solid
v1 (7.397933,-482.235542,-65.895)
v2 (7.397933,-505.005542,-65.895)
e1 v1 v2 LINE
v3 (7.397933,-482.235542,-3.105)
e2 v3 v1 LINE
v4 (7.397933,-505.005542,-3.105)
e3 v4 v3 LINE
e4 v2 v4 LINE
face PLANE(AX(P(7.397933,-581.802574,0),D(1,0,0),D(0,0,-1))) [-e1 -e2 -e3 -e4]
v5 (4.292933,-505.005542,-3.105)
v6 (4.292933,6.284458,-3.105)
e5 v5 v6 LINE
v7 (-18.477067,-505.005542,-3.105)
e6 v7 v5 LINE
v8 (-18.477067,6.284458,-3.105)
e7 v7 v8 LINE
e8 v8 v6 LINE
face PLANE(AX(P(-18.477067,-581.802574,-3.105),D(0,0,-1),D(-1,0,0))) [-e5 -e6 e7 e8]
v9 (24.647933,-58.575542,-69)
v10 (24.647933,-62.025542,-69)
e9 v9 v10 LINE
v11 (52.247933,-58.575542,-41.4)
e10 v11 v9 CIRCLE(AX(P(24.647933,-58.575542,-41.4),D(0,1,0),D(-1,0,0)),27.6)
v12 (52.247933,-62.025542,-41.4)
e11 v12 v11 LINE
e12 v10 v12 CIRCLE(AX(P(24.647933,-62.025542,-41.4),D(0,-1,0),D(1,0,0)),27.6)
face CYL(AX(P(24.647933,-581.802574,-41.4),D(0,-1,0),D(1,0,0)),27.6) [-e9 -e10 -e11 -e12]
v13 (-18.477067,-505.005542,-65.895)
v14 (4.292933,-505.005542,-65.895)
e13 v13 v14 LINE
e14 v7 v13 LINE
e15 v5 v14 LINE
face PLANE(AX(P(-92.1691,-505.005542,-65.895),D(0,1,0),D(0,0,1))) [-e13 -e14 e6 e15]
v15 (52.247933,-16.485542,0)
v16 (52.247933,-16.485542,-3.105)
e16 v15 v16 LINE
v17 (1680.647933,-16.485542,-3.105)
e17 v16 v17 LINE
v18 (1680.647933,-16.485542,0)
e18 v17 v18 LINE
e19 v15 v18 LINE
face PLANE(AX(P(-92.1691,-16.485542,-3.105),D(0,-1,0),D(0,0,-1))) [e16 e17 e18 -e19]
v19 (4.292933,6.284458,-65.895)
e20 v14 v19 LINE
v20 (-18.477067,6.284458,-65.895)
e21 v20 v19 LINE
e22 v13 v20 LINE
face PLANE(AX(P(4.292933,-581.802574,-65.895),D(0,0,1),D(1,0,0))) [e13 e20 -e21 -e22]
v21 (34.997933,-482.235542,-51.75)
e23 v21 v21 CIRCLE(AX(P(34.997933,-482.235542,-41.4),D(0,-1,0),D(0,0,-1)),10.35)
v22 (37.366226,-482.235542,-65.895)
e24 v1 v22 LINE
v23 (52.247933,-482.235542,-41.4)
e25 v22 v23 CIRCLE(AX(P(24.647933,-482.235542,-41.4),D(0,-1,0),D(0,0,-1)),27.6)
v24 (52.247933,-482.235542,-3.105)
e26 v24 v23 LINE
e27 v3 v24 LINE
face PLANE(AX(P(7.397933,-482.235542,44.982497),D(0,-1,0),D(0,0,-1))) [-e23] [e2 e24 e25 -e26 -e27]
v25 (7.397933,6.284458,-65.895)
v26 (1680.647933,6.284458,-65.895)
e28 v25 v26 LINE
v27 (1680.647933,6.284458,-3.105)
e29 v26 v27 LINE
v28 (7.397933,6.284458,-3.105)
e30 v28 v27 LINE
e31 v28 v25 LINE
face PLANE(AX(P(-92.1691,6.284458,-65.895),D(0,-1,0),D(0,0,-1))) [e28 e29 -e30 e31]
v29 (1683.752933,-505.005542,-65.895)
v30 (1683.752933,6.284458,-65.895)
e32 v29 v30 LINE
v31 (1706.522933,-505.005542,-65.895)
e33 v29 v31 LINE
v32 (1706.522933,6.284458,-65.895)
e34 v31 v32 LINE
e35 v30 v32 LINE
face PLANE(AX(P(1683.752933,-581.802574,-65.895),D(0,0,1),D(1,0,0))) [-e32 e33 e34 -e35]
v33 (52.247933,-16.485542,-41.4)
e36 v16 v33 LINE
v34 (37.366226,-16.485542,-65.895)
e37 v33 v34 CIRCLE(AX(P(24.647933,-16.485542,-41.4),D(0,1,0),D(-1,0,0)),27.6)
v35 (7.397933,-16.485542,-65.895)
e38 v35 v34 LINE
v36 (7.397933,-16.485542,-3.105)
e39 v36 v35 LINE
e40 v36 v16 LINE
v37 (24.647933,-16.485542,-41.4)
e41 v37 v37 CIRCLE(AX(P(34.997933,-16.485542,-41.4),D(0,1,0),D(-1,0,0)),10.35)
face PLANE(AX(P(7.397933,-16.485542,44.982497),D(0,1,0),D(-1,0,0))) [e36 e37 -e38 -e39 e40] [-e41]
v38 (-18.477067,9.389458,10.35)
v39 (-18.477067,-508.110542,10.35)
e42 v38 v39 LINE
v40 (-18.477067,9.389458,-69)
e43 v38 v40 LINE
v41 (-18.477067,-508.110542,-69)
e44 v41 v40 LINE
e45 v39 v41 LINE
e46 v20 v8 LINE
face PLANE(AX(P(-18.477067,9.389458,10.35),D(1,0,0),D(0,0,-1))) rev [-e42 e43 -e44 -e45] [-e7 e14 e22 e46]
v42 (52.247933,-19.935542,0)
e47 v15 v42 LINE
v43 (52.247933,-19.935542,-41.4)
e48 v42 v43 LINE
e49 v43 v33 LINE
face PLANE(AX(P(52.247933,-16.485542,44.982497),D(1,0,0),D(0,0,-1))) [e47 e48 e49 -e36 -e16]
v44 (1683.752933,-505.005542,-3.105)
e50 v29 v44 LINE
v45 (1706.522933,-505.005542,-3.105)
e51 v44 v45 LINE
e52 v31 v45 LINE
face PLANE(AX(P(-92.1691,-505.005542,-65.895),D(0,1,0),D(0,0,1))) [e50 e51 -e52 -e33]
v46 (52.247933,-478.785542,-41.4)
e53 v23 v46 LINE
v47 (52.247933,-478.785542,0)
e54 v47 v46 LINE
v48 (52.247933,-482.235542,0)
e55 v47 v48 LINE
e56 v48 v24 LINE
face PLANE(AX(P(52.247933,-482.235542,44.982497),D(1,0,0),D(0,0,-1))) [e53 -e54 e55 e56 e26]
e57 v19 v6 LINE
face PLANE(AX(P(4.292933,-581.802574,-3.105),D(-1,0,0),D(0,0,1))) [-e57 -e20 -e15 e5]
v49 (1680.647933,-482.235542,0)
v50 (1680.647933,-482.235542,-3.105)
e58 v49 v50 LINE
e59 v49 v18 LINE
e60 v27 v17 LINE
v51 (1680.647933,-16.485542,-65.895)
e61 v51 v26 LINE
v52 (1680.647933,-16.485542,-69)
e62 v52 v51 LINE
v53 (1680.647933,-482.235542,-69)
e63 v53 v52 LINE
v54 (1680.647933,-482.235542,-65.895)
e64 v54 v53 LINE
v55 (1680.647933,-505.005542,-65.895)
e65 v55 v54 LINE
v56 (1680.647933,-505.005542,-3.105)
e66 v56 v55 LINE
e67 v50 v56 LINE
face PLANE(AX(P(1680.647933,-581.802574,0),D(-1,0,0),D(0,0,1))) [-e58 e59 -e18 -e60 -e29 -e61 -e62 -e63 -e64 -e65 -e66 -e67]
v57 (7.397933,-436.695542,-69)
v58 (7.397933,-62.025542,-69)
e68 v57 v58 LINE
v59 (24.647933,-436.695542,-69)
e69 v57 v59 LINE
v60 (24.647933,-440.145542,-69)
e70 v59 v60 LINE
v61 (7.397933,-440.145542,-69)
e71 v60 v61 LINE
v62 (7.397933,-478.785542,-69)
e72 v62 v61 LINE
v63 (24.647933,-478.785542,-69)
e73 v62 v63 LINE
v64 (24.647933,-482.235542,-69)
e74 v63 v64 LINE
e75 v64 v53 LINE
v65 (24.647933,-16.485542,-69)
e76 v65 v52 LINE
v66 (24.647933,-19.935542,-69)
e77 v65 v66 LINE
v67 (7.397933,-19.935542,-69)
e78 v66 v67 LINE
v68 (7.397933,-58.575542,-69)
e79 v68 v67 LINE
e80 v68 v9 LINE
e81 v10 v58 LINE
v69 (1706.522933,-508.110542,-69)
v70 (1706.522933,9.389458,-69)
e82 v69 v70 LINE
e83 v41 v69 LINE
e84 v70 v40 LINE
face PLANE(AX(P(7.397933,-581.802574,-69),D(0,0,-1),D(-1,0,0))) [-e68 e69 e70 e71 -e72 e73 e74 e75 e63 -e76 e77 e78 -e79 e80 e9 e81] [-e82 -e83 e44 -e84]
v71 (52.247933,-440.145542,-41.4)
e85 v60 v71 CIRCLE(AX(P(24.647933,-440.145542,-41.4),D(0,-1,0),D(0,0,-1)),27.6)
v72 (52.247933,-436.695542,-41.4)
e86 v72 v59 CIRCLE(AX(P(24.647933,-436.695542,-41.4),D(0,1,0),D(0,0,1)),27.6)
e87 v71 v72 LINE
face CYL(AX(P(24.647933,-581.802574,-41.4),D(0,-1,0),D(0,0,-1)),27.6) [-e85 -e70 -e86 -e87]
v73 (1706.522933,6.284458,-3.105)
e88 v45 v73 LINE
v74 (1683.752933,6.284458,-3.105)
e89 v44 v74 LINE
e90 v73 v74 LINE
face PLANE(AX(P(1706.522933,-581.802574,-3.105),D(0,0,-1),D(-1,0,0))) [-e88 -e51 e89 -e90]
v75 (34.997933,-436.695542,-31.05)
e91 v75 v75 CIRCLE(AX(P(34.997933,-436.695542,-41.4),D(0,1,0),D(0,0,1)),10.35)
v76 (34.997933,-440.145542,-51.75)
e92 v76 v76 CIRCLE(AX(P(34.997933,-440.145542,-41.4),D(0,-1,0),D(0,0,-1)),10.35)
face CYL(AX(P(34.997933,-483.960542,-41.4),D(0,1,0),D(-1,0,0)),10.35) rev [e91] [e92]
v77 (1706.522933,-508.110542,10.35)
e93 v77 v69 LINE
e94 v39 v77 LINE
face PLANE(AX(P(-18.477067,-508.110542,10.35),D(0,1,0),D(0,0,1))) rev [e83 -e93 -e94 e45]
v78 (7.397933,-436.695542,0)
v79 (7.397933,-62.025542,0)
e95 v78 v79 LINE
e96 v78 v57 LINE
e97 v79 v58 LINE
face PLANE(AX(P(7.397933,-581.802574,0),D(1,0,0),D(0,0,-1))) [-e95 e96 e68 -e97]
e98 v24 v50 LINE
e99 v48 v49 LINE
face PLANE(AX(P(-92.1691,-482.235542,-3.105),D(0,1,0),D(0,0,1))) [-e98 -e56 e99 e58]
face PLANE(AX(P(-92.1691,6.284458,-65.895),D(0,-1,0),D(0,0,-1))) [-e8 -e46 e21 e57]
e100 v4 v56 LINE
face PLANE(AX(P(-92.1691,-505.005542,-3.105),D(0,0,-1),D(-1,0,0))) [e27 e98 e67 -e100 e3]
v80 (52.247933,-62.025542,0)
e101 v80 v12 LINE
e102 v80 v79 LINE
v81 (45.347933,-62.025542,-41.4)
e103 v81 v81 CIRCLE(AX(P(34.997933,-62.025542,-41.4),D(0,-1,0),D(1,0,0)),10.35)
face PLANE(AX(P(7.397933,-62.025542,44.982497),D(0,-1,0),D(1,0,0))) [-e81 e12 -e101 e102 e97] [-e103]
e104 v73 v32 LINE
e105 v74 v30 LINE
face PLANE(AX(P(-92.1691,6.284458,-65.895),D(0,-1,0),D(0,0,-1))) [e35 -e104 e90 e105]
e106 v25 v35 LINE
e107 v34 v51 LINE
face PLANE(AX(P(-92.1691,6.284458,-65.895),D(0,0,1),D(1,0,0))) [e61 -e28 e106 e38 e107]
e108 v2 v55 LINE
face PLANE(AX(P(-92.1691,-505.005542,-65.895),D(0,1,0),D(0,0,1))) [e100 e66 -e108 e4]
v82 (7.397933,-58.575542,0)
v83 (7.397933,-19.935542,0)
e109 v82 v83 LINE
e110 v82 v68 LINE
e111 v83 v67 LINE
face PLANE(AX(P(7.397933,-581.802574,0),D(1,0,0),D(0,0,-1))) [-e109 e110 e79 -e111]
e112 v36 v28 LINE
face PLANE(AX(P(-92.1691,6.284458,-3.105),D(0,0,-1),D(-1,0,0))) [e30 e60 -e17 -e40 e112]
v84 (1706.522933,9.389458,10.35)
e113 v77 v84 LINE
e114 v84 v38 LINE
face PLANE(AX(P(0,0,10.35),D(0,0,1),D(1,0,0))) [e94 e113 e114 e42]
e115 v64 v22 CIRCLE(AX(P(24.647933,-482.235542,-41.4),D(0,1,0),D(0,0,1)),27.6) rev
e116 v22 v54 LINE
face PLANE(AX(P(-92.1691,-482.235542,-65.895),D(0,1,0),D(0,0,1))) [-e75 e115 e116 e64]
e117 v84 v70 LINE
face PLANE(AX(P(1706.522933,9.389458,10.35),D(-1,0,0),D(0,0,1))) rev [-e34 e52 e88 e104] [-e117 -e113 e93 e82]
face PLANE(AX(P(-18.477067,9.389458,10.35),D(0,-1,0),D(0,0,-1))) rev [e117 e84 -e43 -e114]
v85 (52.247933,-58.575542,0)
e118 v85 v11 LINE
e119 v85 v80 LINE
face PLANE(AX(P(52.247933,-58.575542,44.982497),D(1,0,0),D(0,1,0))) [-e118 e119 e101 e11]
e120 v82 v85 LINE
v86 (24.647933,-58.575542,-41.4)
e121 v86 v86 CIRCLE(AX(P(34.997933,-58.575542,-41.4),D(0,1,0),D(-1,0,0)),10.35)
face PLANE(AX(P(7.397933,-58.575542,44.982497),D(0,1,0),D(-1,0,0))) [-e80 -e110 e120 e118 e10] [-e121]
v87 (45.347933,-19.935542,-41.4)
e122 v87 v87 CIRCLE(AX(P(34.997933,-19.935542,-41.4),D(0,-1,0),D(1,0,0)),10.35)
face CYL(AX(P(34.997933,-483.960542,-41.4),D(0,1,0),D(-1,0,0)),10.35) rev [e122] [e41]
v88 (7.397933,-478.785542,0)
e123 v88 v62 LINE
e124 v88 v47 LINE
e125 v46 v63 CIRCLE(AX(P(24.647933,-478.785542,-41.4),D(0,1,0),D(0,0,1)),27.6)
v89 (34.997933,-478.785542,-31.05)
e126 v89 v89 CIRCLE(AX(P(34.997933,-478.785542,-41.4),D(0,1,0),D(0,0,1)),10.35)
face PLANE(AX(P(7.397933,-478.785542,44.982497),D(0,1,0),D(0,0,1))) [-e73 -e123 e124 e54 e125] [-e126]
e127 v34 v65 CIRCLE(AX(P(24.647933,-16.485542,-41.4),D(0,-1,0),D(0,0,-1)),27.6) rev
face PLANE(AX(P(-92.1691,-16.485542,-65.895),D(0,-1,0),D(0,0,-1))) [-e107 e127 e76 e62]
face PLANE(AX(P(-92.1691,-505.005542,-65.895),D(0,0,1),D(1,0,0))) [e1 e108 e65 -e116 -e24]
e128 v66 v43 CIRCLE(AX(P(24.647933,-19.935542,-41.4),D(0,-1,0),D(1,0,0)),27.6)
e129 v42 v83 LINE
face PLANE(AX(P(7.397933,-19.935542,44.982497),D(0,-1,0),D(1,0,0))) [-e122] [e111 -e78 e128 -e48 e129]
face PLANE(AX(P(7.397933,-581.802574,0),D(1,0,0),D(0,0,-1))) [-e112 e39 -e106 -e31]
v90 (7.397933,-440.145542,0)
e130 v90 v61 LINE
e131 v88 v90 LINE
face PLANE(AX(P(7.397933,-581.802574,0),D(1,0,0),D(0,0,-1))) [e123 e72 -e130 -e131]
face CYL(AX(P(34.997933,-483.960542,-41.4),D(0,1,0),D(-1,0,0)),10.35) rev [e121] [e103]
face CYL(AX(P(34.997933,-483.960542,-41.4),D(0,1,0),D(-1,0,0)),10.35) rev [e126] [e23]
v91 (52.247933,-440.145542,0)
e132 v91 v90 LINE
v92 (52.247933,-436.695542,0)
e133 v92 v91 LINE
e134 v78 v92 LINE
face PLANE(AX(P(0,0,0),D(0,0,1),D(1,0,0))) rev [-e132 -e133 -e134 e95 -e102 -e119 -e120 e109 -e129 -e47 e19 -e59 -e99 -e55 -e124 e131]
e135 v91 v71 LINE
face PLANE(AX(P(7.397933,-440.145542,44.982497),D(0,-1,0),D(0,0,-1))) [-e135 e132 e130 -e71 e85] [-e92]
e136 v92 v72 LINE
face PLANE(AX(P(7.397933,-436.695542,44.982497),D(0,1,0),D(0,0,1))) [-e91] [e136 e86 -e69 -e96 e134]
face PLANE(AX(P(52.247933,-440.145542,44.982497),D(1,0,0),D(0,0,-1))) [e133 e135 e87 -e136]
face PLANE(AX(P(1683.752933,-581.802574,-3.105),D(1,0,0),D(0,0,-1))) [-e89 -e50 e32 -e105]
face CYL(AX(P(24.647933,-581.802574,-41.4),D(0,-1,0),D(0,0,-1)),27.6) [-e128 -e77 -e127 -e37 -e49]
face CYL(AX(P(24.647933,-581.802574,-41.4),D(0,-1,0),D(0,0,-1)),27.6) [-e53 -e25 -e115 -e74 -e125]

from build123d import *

# Parameters (mm, degrees)
SKETCH_1_W          = 5000
SKETCH_1_H          = 1500
EXTRUDE_1_DEPTH     = 30
EXTRUDE_2_DEPTH     = 1500
EXTRUDE_3_REACH     = 5218.234
EXTRUDE_4_REACH     = 5168.168
SKETCH_5_W          = 130
SKETCH_5_H          = 10
FILLET_2_R          = 80
SKETCH_6_R          = 30
CUT_EXTRUDE_1_DEPTH = 1355
SCALE_1_SCALE       = 0.345


with BuildPart() as part:
    # 草图1 → 凸台-拉伸1 (new body)
    with BuildSketch(Plane.XY):
        with Locations((2446.443283418, -722.784179357)):
            Rectangle(SKETCH_1_W, SKETCH_1_H)
    extrude(amount=EXTRUDE_1_DEPTH)

    # 草图3 → 凸台-拉伸2 (add)
    with BuildSketch(Plane(origin=(0, 27.215820643, 0), x_dir=(1, 0, 0), z_dir=(0, 1, 0))):
        Polygon((-53.556716582, 0), (21.443283418, 0), (21.443283418, 200), (-53.556716582, 200), (-53.556716582, 191), (12.443283418, 191), (12.443283418, 9), (-53.556716582, 9), align=None)
        Polygon((4946.443283418, 9), (4946.443283418, 0), (4871.443283418, 0), (4871.443283418, 200), (4946.443283418, 200), (4946.443283418, 191), (4880.443283418, 191), (4880.443283418, 9), align=None)
    extrude(amount=-EXTRUDE_2_DEPTH)

    # 凸台-拉伸3: up to this face of the body (flat: up to its plane)
    extrude_3_end = Plane(part.part.faces().sort_by_distance((-53.556716582, -722.784179357, 10.5))[0])
    # 草图4 → 凸台-拉伸3 (add, up to the picked face)
    with BuildSketch(Plane(origin=(4946.443283418, 0, 0), x_dir=(0, 0, -1), z_dir=(1, 0, 0)), mode=Mode.PRIVATE) as extrude_3_sk1:
        Polygon((200, 27.215820643), (0, 27.215820643), (0, -47.784179357), (9, -47.784179357), (9, 18.215820643), (191, 18.215820643), (191, -47.784179357), (200, -47.784179357), align=None)
    extrude_3_tool1 = split(extrude(extrude_3_sk1.sketch, amount=-EXTRUDE_3_REACH, mode=Mode.PRIVATE), bisect_by=extrude_3_end, keep=Keep.BOTH, mode=Mode.PRIVATE)
    # 草图4 → 凸台-拉伸3 (add, up to the picked face)
    with BuildSketch(Plane(origin=(4946.443283418, 0, 0), x_dir=(0, 0, -1), z_dir=(1, 0, 0)), mode=Mode.PRIVATE) as extrude_3_sk2:
        Polygon((9, -1397.784179357), (0, -1397.784179357), (0, -1472.784179357), (200, -1472.784179357), (200, -1397.784179357), (191, -1397.784179357), (191, -1463.784179357), (9, -1463.784179357), align=None)
    extrude_3_tool2 = split(extrude(extrude_3_sk2.sketch, amount=-EXTRUDE_3_REACH, mode=Mode.PRIVATE), bisect_by=extrude_3_end, keep=Keep.BOTH, mode=Mode.PRIVATE)
    add(extrude_3_tool1.solids().sort_by(Axis((4946.443283, 25.07982, -100), (-1, 0, 0)))[0])
    add(extrude_3_tool2.solids().sort_by(Axis((4946.443283, -1399.92018, -4.5), (-1, 0, 0)))[0])

    # 凸台-拉伸4: up to this face of the body (flat: up to its plane)
    extrude_4_end = Plane(part.part.faces().sort_by_distance((2446.443283418, -722.784179357, 0))[0])
    # 草图5 → 凸台-拉伸4 (add, up to the picked face)
    with BuildSketch(Plane(origin=(0, 0, -200), x_dir=(-1, 0, 0), z_dir=(0, 0, -1)), mode=Mode.PRIVATE) as extrude_4_sk1:
        with Locations((-86.443283418, -52.784179357)):
            Rectangle(SKETCH_5_W, SKETCH_5_H)
    extrude_4_tool1 = split(extrude(extrude_4_sk1.sketch, amount=-EXTRUDE_4_REACH, mode=Mode.PRIVATE), bisect_by=extrude_4_end, keep=Keep.BOTH, mode=Mode.PRIVATE)
    # 草图5 → 凸台-拉伸4 (add, up to the picked face)
    with BuildSketch(Plane(origin=(0, 0, -200), x_dir=(-1, 0, 0), z_dir=(0, 0, -1)), mode=Mode.PRIVATE) as extrude_4_sk2:
        with Locations((-86.443283418, -174.784179357)):
            Rectangle(SKETCH_5_W, SKETCH_5_H)
    extrude_4_tool2 = split(extrude(extrude_4_sk2.sketch, amount=-EXTRUDE_4_REACH, mode=Mode.PRIVATE), bisect_by=extrude_4_end, keep=Keep.BOTH, mode=Mode.PRIVATE)
    # 草图5 → 凸台-拉伸4 (add, up to the picked face)
    with BuildSketch(Plane(origin=(0, 0, -200), x_dir=(-1, 0, 0), z_dir=(0, 0, -1)), mode=Mode.PRIVATE) as extrude_4_sk3:
        with Locations((-86.443283418, -1270.784179357)):
            Rectangle(SKETCH_5_W, SKETCH_5_H)
    extrude_4_tool3 = split(extrude(extrude_4_sk3.sketch, amount=-EXTRUDE_4_REACH, mode=Mode.PRIVATE), bisect_by=extrude_4_end, keep=Keep.BOTH, mode=Mode.PRIVATE)
    # 草图5 → 凸台-拉伸4 (add, up to the picked face)
    with BuildSketch(Plane(origin=(0, 0, -200), x_dir=(-1, 0, 0), z_dir=(0, 0, -1)), mode=Mode.PRIVATE) as extrude_4_sk4:
        with Locations((-86.443283418, -1392.784179357)):
            Rectangle(SKETCH_5_W, SKETCH_5_H)
    extrude_4_tool4 = split(extrude(extrude_4_sk4.sketch, amount=-EXTRUDE_4_REACH, mode=Mode.PRIVATE), bisect_by=extrude_4_end, keep=Keep.BOTH, mode=Mode.PRIVATE)
    add(extrude_4_tool1.solids().sort_by(Axis((86.443283, -52.784179, -200), (0, 0, 1)))[0])
    add(extrude_4_tool2.solids().sort_by(Axis((86.443283, -174.784179, -200), (0, 0, 1)))[0])
    add(extrude_4_tool3.solids().sort_by(Axis((86.443283, -1270.784179, -200), (0, 0, 1)))[0])
    add(extrude_4_tool4.solids().sort_by(Axis((86.443283, -1392.784179, -200), (0, 0, 1)))[0])

    # 圆角2
    # the kernel refuses this fillet: 80 mm, written as the material it takes off along each edge
    with BuildSketch(Plane(origin=(151.443283418, -47.784179357, -200), x_dir=(-1, 0, 0), z_dir=(0, -1, 0))) as fillet_2_piece_1:
        with BuildLine():
            CenterArc((FILLET_2_R, -FILLET_2_R), FILLET_2_R, 90, 90)
            Line((0, -FILLET_2_R), (0, 0))
            Line((0, 0), (FILLET_2_R, 0))
        make_face()
    extrude(amount=210, mode=Mode.SUBTRACT)
    with BuildSketch(Plane(origin=(151.443283418, 30.215820643, -200), x_dir=(-1, 0, 0), z_dir=(0, -1, 0))) as fillet_2_piece_2_section:
        with BuildLine():
            CenterArc((FILLET_2_R, -FILLET_2_R), FILLET_2_R, 90, 90)
            Line((0, -FILLET_2_R), (0, 0))
            Line((0, 0), (FILLET_2_R, 0))
        make_face()
    fillet_2_piece_2 = extrude(amount=410, mode=Mode.PRIVATE)
    fillet_2_piece_2 = split(fillet_2_piece_2, bisect_by=Plane(origin=(123.199877996, -47.784179357, -195.897838893), z_dir=(0, -1, 0)), keep=Keep.TOP, mode=Mode.PRIVATE)
    add(fillet_2_piece_2, mode=Mode.SUBTRACT)
    with BuildSketch(Plane(origin=(151.443283418, -1065.784179357, -200), x_dir=(-1, 0, 0), z_dir=(0, -1, 0))) as fillet_2_piece_3_section:
        with BuildLine():
            CenterArc((FILLET_2_R, -FILLET_2_R), FILLET_2_R, 90, 90)
            Line((0, -FILLET_2_R), (0, 0))
            Line((0, 0), (FILLET_2_R, 0))
        make_face()
    fillet_2_piece_3 = extrude(amount=410, mode=Mode.PRIVATE)
    fillet_2_piece_3 = split(fillet_2_piece_3, bisect_by=Plane(origin=(123.199877996, -1397.784179357, -195.897838893), z_dir=(0, 1, 0)), keep=Keep.TOP, mode=Mode.PRIVATE)
    add(fillet_2_piece_3, mode=Mode.SUBTRACT)
    with BuildSketch(Plane(origin=(151.443283418, -1397.784179357, -200), x_dir=(-1, 0, 0), z_dir=(0, 1, 0))) as fillet_2_piece_4:
        with BuildLine():
            CenterArc((FILLET_2_R, FILLET_2_R), FILLET_2_R, 180, 90)
            Line((0, FILLET_2_R), (0, 0))
            Line((0, 0), (FILLET_2_R, 0))
        make_face()
    extrude(amount=210, mode=Mode.SUBTRACT)

    # 草图6 → 切除-拉伸1 (cut)
    with BuildSketch(Plane(origin=(0, -47.784179357, 0), x_dir=(1, 0, 0), z_dir=(0, 1, 0))):
        with Locations(Location((101.443283418, 120, 0), (0, 0, 270))):
            Circle(SKETCH_6_R)
    extrude(amount=-CUT_EXTRUDE_1_DEPTH, mode=Mode.SUBTRACT)


with BuildPart() as part_1:
    # 缩放比例1: scaled about (0, 0, 0)
    add(part.part.scale(SCALE_1_SCALE))


solid = part_1.part
